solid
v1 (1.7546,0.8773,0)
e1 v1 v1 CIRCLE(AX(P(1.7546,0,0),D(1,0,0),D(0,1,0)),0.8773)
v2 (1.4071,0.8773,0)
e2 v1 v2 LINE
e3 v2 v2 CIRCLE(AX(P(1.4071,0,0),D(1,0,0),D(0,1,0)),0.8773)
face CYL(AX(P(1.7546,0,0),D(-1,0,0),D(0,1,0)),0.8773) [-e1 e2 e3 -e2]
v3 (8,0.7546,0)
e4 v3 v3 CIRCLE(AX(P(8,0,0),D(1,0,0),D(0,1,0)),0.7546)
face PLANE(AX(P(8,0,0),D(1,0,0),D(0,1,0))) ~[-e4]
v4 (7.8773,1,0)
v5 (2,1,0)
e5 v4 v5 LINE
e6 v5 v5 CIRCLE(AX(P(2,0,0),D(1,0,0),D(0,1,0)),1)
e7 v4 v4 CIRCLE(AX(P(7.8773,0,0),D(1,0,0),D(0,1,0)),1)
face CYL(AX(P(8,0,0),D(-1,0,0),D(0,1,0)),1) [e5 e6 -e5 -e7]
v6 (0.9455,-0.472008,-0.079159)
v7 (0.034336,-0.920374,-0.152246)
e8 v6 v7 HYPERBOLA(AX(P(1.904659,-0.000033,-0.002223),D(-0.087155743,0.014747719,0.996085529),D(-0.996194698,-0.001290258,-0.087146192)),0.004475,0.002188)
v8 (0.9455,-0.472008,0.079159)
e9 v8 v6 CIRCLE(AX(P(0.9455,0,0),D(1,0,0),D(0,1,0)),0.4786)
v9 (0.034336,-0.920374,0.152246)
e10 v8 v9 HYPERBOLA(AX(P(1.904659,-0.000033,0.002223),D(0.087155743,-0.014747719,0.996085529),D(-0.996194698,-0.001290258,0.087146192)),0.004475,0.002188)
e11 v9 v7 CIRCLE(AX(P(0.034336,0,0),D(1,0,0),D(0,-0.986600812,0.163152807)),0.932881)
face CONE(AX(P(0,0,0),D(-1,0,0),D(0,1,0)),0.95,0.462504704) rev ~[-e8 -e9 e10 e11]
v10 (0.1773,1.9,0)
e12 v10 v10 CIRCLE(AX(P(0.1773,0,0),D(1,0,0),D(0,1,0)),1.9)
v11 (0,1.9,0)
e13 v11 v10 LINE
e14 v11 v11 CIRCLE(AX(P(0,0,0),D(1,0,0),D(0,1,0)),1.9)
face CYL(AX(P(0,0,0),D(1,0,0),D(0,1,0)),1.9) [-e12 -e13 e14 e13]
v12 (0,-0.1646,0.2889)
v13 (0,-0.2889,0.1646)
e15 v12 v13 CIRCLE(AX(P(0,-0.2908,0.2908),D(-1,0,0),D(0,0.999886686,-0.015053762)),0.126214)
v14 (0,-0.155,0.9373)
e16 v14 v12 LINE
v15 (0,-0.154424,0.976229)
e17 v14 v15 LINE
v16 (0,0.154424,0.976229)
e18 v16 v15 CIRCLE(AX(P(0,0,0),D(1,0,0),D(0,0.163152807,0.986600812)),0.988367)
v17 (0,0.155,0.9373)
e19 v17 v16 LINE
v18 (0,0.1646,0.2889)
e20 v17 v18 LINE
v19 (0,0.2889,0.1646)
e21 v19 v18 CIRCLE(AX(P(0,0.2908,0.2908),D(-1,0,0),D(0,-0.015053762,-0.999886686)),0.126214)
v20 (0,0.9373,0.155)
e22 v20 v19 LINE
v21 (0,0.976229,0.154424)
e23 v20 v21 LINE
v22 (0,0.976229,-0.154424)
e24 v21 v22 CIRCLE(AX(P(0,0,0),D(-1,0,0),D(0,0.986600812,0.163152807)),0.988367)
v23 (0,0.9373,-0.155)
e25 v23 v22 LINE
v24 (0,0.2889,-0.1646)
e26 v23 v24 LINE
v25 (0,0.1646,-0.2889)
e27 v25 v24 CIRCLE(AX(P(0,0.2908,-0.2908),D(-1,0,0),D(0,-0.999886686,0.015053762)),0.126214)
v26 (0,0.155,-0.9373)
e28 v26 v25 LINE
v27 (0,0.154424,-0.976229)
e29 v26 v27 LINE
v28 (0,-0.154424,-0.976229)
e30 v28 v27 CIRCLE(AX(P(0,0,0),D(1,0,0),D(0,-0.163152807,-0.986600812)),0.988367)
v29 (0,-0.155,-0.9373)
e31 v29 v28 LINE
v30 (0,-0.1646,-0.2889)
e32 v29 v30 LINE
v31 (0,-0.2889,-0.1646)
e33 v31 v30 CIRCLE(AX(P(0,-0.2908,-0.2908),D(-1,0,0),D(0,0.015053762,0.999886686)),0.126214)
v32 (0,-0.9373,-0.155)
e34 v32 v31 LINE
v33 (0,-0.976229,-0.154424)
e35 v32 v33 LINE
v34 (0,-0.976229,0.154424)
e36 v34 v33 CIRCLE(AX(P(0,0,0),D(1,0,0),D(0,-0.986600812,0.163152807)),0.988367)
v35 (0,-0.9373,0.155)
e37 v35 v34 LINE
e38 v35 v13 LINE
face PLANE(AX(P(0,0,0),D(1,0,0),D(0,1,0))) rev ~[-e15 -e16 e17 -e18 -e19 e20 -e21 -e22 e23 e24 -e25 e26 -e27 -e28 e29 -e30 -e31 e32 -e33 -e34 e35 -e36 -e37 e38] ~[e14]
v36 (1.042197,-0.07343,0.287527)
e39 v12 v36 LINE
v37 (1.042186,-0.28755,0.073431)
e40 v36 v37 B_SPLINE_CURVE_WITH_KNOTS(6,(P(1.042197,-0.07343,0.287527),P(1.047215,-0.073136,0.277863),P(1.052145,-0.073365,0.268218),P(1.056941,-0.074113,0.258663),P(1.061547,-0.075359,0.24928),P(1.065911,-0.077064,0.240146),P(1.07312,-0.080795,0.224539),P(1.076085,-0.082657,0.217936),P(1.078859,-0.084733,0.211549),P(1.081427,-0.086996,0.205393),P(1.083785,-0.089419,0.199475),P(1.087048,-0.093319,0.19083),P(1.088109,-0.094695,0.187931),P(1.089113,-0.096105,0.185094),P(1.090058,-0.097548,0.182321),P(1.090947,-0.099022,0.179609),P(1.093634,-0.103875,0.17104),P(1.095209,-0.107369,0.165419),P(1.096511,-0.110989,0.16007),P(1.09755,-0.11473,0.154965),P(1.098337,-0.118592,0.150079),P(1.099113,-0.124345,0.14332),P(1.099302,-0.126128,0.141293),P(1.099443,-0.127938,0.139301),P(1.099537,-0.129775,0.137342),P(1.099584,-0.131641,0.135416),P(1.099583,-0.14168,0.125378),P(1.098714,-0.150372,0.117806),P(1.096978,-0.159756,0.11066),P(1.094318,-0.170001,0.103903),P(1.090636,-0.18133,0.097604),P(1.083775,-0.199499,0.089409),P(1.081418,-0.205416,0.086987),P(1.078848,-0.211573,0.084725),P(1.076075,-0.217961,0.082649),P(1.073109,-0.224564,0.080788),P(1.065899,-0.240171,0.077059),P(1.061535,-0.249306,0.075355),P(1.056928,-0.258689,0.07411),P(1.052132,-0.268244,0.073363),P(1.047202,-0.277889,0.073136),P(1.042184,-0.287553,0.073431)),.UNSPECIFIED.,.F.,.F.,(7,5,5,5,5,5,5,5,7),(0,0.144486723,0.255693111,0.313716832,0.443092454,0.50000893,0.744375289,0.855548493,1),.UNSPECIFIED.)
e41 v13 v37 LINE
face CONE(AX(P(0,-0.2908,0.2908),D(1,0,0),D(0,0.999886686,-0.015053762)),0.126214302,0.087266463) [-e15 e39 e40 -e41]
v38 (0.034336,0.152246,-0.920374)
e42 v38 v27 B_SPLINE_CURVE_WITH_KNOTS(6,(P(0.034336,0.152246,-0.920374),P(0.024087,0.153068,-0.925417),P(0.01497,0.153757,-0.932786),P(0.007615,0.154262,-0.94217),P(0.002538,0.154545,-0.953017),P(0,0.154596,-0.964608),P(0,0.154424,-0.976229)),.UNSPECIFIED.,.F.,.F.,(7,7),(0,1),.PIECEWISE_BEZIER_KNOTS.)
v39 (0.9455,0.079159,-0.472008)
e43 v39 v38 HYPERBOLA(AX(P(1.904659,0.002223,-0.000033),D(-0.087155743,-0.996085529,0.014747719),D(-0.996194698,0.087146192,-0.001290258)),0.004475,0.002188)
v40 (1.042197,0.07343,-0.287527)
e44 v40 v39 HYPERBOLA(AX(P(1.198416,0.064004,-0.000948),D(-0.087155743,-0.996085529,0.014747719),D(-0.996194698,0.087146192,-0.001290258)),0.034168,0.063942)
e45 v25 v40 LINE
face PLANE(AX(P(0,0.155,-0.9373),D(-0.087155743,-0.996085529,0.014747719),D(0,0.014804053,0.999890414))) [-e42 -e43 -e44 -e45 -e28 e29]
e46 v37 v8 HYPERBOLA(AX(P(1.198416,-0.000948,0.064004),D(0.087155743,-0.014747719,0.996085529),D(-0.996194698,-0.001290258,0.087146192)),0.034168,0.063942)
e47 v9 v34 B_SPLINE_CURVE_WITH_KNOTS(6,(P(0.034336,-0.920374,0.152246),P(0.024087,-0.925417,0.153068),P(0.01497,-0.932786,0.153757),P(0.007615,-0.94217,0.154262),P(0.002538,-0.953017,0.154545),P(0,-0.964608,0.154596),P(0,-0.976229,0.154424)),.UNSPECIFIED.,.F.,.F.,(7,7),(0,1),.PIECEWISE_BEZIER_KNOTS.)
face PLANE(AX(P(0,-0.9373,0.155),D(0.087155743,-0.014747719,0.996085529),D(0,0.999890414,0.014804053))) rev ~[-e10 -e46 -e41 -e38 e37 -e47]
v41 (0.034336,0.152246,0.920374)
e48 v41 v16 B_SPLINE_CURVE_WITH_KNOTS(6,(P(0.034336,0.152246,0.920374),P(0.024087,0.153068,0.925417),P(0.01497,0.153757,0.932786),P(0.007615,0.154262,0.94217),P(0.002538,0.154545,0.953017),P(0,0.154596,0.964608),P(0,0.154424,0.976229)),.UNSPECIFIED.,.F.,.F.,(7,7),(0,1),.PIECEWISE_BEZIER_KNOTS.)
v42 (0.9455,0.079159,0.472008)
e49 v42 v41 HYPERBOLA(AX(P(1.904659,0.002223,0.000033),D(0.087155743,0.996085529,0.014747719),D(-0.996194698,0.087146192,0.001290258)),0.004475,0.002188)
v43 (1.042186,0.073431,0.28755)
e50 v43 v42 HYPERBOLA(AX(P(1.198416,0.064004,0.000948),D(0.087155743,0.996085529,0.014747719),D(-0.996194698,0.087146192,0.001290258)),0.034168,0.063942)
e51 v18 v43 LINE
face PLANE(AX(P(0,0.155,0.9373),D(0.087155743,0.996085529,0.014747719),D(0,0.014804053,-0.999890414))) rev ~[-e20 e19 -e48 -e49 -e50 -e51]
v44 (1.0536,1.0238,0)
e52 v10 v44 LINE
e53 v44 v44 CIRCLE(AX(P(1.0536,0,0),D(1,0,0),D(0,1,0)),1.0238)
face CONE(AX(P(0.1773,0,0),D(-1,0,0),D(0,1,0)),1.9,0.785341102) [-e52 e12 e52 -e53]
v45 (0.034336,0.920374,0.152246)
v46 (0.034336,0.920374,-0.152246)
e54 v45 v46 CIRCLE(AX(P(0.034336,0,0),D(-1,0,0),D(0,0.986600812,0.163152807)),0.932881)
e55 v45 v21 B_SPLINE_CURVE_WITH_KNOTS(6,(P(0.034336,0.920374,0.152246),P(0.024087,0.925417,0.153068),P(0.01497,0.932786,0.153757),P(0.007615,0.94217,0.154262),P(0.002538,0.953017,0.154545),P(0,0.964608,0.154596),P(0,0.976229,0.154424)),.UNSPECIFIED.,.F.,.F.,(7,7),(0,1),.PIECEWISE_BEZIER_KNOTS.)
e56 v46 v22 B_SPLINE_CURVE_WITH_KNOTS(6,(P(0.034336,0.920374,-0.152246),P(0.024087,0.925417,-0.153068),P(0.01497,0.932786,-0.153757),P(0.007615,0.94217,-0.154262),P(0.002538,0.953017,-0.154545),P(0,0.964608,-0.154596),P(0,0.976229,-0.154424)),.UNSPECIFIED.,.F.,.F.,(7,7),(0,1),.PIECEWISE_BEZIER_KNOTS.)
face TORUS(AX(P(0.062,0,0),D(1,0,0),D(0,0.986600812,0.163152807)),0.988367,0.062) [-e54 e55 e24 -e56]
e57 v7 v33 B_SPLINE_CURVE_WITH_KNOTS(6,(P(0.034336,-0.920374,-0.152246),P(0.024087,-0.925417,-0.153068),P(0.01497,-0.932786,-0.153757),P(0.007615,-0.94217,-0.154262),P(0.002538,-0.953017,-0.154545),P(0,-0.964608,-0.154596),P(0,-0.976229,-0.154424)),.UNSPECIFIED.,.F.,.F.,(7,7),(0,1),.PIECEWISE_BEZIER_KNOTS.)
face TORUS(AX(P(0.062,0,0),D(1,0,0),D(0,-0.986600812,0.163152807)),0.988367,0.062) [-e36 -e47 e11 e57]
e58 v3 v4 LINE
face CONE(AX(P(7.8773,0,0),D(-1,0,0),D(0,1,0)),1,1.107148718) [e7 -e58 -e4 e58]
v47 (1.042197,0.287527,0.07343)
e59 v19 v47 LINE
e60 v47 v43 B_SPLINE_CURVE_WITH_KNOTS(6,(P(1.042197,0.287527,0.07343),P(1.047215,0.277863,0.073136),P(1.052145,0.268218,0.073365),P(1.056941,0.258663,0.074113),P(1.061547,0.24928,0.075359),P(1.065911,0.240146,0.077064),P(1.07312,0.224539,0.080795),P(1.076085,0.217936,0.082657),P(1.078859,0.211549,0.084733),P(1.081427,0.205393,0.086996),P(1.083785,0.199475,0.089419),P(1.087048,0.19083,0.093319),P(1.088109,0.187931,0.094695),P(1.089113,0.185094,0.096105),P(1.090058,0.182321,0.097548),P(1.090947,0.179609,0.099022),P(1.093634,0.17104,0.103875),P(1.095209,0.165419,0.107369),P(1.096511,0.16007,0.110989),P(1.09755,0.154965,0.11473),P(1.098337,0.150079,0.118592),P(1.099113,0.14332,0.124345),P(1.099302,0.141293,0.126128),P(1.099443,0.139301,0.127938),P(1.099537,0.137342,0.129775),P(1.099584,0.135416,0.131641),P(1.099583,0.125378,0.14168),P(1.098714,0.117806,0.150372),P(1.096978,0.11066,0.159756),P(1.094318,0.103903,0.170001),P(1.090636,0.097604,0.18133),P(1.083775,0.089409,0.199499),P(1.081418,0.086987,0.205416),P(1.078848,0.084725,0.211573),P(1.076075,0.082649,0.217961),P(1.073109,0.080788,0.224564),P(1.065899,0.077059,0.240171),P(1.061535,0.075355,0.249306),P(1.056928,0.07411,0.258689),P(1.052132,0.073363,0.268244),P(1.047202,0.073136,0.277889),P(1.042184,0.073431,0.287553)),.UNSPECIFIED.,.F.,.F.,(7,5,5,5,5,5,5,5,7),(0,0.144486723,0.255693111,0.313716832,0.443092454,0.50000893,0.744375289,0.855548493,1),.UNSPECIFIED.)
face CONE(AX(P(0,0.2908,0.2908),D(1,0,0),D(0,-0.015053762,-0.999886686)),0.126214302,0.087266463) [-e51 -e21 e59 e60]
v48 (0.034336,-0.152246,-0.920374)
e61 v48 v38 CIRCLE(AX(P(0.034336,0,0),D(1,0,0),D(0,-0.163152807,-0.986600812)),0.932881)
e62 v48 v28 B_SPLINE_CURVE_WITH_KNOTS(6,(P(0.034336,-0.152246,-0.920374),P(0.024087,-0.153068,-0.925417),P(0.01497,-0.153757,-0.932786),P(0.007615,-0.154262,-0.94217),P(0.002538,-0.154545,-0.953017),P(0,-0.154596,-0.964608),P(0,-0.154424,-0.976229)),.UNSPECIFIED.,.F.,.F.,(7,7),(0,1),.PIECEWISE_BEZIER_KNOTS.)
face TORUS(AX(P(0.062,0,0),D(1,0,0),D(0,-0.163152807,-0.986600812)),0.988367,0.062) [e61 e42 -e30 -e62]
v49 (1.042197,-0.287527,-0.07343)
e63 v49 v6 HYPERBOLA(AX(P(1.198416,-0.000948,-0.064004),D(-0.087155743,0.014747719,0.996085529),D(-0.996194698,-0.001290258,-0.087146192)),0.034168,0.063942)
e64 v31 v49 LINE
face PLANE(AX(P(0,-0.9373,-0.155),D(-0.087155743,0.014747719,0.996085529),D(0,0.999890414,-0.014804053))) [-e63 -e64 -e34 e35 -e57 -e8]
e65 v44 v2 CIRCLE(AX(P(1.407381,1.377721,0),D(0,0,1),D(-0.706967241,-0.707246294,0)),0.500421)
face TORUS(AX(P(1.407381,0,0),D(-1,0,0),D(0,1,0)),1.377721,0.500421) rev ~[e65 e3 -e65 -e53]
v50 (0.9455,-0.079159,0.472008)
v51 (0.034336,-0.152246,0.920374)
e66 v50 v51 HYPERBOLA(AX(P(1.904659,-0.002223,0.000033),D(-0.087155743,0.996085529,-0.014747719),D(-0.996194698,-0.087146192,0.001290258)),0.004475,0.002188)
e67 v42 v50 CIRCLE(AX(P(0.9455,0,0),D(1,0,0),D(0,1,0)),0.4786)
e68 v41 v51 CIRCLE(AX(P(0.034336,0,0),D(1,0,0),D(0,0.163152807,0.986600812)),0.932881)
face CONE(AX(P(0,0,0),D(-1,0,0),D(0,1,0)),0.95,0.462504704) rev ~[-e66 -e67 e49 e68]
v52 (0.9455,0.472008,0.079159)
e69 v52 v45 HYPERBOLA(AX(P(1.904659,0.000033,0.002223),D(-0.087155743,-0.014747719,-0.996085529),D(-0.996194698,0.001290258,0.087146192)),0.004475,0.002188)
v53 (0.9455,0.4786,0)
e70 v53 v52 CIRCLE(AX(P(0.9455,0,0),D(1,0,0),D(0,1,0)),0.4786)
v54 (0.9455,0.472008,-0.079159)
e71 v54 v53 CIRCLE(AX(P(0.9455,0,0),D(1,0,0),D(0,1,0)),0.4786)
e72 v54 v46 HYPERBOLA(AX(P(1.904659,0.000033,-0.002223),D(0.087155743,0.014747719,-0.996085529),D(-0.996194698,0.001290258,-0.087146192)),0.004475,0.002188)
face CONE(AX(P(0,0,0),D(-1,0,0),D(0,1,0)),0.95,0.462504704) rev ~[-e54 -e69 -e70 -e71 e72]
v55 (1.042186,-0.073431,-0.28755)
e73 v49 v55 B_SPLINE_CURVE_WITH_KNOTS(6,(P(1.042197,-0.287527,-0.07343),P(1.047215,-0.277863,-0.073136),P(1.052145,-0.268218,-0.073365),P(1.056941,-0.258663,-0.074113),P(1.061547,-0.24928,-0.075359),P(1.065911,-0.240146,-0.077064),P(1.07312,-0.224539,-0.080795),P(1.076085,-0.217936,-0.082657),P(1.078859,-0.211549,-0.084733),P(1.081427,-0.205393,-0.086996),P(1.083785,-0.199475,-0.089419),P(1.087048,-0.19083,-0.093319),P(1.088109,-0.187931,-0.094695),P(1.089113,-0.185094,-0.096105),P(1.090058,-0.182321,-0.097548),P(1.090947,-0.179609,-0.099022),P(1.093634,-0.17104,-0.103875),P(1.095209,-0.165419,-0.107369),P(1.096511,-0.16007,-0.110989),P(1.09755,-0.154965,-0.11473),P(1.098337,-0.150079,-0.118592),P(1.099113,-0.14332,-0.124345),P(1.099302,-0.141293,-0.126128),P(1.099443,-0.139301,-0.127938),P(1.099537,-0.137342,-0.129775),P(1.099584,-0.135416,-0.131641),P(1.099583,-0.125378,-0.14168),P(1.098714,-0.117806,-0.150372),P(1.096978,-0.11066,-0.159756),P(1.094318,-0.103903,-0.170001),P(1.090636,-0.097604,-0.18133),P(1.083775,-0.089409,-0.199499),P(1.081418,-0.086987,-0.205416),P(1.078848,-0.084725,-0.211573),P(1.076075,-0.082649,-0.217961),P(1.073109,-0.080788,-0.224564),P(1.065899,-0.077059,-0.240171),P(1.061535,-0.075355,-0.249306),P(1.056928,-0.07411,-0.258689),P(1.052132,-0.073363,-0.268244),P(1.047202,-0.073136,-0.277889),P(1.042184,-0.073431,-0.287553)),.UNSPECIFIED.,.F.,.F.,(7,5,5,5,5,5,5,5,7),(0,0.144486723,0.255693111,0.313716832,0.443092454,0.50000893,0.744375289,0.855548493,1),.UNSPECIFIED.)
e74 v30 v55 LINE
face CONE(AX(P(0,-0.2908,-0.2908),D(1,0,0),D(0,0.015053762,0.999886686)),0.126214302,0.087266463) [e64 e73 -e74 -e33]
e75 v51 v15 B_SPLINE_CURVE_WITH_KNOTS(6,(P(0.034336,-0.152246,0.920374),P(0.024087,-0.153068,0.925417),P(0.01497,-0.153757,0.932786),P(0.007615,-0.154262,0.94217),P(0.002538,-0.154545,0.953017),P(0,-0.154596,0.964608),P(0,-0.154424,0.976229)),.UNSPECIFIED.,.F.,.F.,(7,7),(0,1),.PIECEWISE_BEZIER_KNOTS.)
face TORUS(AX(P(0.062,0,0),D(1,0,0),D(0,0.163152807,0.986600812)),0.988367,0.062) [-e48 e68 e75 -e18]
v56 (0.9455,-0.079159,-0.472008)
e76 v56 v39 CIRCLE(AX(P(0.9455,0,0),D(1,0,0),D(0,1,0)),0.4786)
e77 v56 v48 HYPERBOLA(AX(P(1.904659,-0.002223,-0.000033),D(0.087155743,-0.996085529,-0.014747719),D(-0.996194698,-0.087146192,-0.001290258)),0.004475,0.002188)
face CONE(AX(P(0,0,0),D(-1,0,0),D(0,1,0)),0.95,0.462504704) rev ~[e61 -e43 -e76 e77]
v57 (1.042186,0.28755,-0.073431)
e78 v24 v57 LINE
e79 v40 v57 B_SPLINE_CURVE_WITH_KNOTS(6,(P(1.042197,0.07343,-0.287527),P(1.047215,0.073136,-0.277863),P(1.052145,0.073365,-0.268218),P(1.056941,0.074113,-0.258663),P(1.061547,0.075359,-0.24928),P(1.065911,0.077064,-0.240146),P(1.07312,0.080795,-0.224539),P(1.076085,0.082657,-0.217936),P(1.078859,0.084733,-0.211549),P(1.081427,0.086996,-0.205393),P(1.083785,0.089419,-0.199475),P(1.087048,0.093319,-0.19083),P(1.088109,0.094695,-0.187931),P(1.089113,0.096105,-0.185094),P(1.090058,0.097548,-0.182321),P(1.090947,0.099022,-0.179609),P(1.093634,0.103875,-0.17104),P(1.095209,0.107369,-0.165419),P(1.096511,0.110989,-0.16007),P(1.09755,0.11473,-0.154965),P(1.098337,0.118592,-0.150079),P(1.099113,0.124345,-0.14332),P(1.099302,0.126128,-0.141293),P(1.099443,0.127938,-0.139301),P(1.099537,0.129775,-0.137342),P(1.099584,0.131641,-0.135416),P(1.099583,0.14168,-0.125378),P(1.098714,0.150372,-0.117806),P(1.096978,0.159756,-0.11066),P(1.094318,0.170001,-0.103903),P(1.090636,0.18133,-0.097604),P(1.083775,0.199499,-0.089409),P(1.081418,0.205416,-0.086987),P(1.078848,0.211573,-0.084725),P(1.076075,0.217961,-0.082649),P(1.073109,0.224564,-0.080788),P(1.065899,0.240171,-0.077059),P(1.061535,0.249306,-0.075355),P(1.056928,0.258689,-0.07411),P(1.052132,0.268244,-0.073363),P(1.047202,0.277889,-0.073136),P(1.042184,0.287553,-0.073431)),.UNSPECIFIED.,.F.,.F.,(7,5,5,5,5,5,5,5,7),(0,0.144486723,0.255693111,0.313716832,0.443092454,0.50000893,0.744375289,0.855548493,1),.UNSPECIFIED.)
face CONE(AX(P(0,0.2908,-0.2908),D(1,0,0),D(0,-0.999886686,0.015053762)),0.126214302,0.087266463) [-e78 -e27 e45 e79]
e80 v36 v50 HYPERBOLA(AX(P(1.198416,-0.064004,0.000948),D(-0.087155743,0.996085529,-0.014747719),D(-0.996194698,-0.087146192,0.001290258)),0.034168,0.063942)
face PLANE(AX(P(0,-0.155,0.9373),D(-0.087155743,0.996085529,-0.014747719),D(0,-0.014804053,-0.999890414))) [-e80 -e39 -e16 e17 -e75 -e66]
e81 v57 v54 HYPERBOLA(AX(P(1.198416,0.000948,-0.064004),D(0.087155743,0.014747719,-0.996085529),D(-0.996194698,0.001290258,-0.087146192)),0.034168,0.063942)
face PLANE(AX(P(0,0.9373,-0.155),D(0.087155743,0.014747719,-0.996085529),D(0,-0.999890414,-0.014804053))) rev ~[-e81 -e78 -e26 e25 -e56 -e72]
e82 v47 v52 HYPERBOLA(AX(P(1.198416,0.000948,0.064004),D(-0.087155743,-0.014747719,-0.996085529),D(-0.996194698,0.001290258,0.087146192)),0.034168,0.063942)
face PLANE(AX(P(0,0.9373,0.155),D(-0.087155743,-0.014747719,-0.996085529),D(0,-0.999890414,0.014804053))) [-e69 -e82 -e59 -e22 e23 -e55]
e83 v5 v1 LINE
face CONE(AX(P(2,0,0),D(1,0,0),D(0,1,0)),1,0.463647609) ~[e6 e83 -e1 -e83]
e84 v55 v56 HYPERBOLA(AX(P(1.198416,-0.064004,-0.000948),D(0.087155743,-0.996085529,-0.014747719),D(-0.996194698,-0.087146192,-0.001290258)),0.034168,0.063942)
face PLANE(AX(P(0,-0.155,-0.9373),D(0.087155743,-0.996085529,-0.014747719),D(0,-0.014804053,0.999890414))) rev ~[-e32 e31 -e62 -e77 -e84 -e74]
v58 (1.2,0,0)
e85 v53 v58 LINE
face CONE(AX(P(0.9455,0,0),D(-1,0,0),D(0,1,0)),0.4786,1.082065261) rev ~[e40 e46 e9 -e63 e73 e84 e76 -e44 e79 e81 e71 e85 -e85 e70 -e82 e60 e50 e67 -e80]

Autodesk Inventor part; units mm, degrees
ref_plane "YZ Plane" through (0, 0, 0) normal (1, 0, 0) x (0, 1, 0)
ref_plane "XZ Plane" through (0, 0, 0) normal (0, 1, 0) x (-1, 0, 0)
sketch "Sketch1" plane through (0, 0, 0) normal (0, 0, 1) x (1, 0, 0)
  line L0 (1.2, 0) -> (8, 0)
  line L1 (8, 0) -> (8, 1)
  line L2 (8, 1) -> (2, 1)
  line L3 (2, 1) -> (1.7546, 0.8773)
  line L4 (1.7546, 0.8773) -> (1.4071, 0.8773)
  line L5 (0, 1.9) -> (0, 0.95)
  line L6 (0, 0.95) -> (0.9455, 0.4786)
  line L7 (0.9455, 0.4786) -> (1.2, 0)
  line L8 (-1.6, 0) -> (9.6, 0) projected
  line L9 (0, -0.38) -> (0, 2.28) projected
  line L10 (0, 1.9) -> (0.1773, 1.9)
  line L11 (0.1773, 1.9) -> (1.0536, 1.0238)
  line L12 (2, 1) -> (1.0773, 1) construction
  arc A0 (1.0536, 1.0238) -> (1.4071, 0.8773) centre (1.4071, 1.3773) ccw
  point P0 (1.2, 0.8773)
  dimension "d1" = 6
  dimension "d2" = 2
  dimension "d3" = 1.7546
  dimension "d4" = 1.9
  dimension "d5" = 26.5
  dimension "d6" = 62
  dimension "d7" = 1.2
  dimension "d8" = 0.2454
  dimension "d12" = 3.8
  dimension "d13" = 45
  dimension "d15" = 8
  dimension "d24" = 1.2
  dimension "d93" = 0.5
revolve "Body" add sketch "Sketch1" angle 360 about axis through (1.2, 0, 0) along (1, 0, 0) contours L7 L6 L5 L10 L11 A0 L4 L3 L2 L1 L0
sketch "Sketch2" plane through (0, 0, 0) normal (-1, 0, 0) x (0, 0, 1)
  line L0 (0, 0.95) -> (0, 0) construction
  line L1 (0, 0) -> (0.95, 0) construction
  arc A0 (0.285, 0) -> (0, 0.285) centre (0, 0) ccw construction
  arc A1 (0.3325, 0) -> (0, 0.3325) centre (0, 0) ccw construction
  arc A2 (0.9373, 0.155) -> (0.155, 0.9373) centre (0, 0) ccw
  line L2 (0, 0) -> (0.6718, 0.6718) construction
  line L3 (0.155, 0.9373) -> (0.1646, 0.2889)
  line L4 (0.9373, 0.155) -> (0.2889, 0.1646)
  arc A3 (0.155, 0.9373) -> (0, 0.95) centre (0, 0) ccw
  arc A4 (0.95, 0) -> (0.9373, 0.155) centre (0, 0) ccw
  line L5 (0, -2.66) -> (0, 2.66) projected
  line L6 (-2.66, 0) -> (2.66, 0) projected
  arc A5 (0.155, -0.9373) -> (0.9373, -0.155) centre (0, 0) ccw
  line L7 (0.155, -0.9373) -> (0.1646, -0.2889)
  line L8 (0.9373, -0.155) -> (0.2889, -0.1646)
  arc A6 (0, -0.95) -> (0.155, -0.9373) centre (0, 0) ccw
  arc A7 (0.9373, -0.155) -> (0.95, 0) centre (0, 0) ccw
  arc A8 (-0.155, 0.9373) -> (-0.9373, 0.155) centre (0, 0) ccw
  line L9 (-0.155, 0.9373) -> (-0.1646, 0.2889)
  line L10 (-0.9373, 0.155) -> (-0.2889, 0.1646)
  arc A9 (0, 0.95) -> (-0.155, 0.9373) centre (0, 0) ccw
  arc A10 (-0.9373, 0.155) -> (-0.95, 0) centre (0, 0) ccw
  arc A11 (-0.155, -0.9373) -> (0, -0.95) centre (0, 0) ccw
  arc A12 (-0.9373, -0.155) -> (-0.155, -0.9373) centre (0, 0) ccw
  arc A13 (-0.95, 0) -> (-0.9373, -0.155) centre (0, 0) ccw
  line L11 (-0.9373, -0.155) -> (-0.2889, -0.1646)
  line L12 (-0.155, -0.9373) -> (-0.1646, -0.2889)
  arc A14 (0.1646, 0.2889) -> (0.2889, 0.1646) centre (0.2908, 0.2908) ccw
  arc A15 (0.2889, -0.1646) -> (0.1646, -0.2889) centre (0.2908, -0.2908) ccw
  arc A16 (-0.2889, 0.1646) -> (-0.1646, 0.2889) centre (-0.2908, 0.2908) ccw
  arc A17 (-0.1646, -0.2889) -> (-0.2889, -0.1646) centre (-0.2908, -0.2908) ccw
  point P0 (0.6718, -0.6718)
  point P1 (-0.6718, 0.6718)
  point P2 (-0.6718, -0.6718)
  dimension "d17" = 0.57
  dimension "d18" = 0.665
  dimension "d19" = 1.9
  dimension "d20" = 45
  dimension "d21" = 0.155
extrude "Slot" add sketch "Sketch2" against normal up to next draft 5 contours L4 A14 L3 A2 | A5 L7 A15 L8 | L9 A16 L10 A8 | A12 L11 A17 L12
fillet "Fillet1" radius 0.062 4 edges at (0, 0.95, 0) (0, 0, -0.95) (0, -0.95, 0) (0, 0, 0.95)
thread "Thread" size "M2x0.4" class "6g" standard "ISO Metric profile" length 6
chamfer "Chamfer1" distance 0.2454 distance2 0.1227 1 edges at (8, -1, 0) measured on face at (8, -0.1182, -0.3117)
ref_plane "Work Plane2" through (3.35, 0, 0) normal (0, 0, -1) x (1, 0, 0)
equation "\"d1\" = GEL"
equation "\"d2\" = GD"
equation "\"d3\" = BDM"
equation "\"d4\" = SDM"
equation "\"d7\" = INTI"
equation "\"d8\" = GAL"
equation "\"d12\" = KOD"
equation "\"d13\" = 0.5 * SEWI"
equation "\"d15\" = NLG"
equation "\"d24\" = KOH"
equation "\"d93\" = R"
equation "\"d17\" = 0.3 * SDM"
equation "\"d18\" = 0.35 * SDM"
equation "\"d19\" = SDM"
equation "\"d21\" = 0.5 * SBR"
equation "\"d23\" = 0.2 * SBR"
equation "\"d10\" = GEL"
equation "\"d25\" = -0.5 * SPD + 0.5 * GD"
equation "\"d26\" = 0.5 * GAL"
equation "\"NLG\" = 8"
equation "\"GEL\" = 6"
equation "\"GAL\" = 0.61345 * PTC"
equation "\"SPD\" = NND - 1.2269 * PTC"
equation "\"KOD\" = 3.8"
equation "\"KOH\" = 1.2"
equation "\"SBR\" = 0.31"
equation "\"INTI\" = 1.2"
equation "\"SDM\" = 1.9"
equation "\"GD\" = NND"
equation "\"BDM\" = NND - GAL"
equation "\"SEWI\" = 90deg"
equation "\"d9\" = SDM"
equation "\"R\" = 0.5"
equation "\"GUL\" = 0.61345 * PTC"
equation "\"TOA\" = 30deg"
equation "\"EPV\" = 2.2"
equation "\"THREADDIA\" = 2"
equation "\"PTC\" = 0.4"
equation "\"NND\" = 2"
equation "\"GD1\" = THREADDIA - 1.2269 * PTC"
properties part number "ISO 7046-1  - M2 x 8 - 4.8 - H" material "Steel"
